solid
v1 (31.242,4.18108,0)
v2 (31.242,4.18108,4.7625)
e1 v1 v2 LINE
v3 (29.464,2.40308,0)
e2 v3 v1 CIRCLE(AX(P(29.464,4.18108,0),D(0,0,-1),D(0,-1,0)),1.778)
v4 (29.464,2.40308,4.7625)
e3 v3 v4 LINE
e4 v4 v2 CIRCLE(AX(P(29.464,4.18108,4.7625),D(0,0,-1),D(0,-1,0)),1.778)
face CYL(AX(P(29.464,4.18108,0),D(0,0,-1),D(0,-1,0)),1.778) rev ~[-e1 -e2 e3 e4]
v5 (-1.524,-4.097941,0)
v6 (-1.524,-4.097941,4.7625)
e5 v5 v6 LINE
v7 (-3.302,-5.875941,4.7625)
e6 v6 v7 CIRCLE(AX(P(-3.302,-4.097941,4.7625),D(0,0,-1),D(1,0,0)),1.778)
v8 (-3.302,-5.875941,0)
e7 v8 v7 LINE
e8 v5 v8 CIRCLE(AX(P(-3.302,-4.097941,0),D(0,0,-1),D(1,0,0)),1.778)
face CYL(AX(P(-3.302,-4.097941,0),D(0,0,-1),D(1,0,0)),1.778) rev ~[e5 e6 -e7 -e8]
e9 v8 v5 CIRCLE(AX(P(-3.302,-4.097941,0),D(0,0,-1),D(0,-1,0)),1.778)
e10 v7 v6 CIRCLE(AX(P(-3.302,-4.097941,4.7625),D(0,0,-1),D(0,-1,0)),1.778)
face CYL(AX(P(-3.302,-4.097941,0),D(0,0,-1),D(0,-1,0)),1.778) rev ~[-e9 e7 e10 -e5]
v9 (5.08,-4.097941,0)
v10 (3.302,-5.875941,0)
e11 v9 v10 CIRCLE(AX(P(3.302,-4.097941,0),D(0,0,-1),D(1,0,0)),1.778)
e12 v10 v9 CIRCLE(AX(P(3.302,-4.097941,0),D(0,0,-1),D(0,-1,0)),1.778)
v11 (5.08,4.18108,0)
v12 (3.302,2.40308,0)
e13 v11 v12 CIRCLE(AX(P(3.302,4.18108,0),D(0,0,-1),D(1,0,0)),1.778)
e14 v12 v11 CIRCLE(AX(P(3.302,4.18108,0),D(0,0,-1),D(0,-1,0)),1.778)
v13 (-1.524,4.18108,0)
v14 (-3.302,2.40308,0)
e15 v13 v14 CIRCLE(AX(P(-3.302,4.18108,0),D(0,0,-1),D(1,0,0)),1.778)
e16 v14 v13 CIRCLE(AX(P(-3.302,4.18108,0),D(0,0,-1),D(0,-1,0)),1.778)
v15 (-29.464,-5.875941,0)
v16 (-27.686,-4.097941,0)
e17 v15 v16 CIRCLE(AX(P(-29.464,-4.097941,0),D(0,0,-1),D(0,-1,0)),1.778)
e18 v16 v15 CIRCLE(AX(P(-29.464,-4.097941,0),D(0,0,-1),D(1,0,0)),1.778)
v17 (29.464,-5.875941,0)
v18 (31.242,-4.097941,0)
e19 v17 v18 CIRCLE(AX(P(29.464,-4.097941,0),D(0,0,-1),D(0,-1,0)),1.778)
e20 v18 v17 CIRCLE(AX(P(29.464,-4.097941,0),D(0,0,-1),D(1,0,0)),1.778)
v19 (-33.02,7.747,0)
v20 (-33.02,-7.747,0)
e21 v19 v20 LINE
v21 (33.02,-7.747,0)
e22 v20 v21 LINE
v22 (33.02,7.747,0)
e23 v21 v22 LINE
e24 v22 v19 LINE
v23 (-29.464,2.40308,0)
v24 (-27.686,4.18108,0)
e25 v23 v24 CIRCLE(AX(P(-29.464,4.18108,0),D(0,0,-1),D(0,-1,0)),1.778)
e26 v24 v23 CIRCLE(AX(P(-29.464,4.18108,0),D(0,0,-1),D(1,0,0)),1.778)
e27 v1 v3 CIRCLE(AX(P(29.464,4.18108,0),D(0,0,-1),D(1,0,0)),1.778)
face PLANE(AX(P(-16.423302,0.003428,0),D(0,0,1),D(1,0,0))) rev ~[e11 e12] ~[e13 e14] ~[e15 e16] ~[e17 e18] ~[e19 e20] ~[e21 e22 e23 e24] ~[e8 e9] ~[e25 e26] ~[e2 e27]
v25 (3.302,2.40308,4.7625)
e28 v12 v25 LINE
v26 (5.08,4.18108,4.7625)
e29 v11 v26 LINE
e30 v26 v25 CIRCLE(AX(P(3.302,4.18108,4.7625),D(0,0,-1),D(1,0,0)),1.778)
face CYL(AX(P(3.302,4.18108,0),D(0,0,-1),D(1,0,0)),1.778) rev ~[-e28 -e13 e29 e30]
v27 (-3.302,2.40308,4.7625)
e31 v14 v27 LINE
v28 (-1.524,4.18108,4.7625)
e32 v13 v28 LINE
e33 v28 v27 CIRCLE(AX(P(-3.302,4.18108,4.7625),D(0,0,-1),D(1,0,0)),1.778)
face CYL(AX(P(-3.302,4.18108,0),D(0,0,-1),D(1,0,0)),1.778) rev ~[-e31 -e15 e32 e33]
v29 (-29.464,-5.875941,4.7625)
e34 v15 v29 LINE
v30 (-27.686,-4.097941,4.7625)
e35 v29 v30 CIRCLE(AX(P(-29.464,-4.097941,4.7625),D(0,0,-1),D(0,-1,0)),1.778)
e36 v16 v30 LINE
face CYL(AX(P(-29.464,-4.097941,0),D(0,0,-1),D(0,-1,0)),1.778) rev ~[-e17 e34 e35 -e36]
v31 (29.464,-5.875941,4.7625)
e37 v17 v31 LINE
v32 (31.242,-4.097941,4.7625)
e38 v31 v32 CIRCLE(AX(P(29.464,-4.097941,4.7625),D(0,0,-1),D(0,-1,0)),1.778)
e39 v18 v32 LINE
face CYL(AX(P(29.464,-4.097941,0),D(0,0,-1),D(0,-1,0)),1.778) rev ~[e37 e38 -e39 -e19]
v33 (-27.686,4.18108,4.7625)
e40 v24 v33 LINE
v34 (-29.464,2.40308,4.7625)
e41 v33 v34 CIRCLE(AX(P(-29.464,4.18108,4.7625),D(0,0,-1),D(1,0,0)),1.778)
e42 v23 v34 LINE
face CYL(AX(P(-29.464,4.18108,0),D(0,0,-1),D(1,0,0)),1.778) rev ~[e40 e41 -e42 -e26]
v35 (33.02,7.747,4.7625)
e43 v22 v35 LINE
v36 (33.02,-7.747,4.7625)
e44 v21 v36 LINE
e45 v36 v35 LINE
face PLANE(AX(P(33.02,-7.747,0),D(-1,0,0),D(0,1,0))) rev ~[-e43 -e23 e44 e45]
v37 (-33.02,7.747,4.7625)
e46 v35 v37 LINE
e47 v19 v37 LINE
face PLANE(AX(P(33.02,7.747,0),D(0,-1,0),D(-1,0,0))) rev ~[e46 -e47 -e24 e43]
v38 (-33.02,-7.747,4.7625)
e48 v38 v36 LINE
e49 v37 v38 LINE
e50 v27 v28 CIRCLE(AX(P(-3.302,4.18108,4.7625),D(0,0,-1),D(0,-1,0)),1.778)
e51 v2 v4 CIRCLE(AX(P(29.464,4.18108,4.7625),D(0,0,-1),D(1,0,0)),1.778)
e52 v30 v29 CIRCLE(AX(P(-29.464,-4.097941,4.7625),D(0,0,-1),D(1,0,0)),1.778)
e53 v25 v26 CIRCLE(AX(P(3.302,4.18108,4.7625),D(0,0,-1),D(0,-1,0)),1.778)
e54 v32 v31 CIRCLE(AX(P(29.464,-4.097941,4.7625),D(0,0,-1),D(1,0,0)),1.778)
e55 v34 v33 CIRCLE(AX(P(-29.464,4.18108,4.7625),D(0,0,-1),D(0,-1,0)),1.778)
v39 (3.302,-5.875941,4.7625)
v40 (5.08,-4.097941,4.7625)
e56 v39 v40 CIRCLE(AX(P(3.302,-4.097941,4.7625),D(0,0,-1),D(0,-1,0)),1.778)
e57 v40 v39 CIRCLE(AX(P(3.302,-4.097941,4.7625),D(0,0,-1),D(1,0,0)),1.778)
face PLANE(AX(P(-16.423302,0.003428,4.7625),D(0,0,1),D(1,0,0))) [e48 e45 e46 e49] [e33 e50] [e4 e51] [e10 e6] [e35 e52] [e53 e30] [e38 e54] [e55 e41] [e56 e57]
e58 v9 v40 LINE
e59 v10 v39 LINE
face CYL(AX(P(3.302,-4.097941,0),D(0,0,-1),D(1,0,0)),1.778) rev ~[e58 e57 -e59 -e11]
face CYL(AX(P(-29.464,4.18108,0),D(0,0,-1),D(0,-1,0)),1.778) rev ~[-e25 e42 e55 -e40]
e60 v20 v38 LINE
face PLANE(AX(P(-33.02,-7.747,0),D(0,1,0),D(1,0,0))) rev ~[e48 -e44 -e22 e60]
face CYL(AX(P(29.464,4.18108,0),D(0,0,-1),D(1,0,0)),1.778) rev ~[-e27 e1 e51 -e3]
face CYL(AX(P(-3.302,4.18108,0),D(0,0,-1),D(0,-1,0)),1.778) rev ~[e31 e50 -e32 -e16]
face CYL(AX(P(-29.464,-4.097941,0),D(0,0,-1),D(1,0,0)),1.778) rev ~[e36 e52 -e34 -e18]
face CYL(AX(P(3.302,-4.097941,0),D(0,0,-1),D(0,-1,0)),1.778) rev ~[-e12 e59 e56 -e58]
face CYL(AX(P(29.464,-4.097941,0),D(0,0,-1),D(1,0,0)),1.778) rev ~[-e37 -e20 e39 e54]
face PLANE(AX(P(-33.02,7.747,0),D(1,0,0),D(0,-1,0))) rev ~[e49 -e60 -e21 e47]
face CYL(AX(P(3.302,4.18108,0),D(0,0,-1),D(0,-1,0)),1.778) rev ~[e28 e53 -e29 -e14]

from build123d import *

# Parameters (mm, degrees)
F1_DEPTH = 4.7625


# Not quite as in the source:
# - a length typed as a fraction of an inch, garbled in the dataset ("3 / 203.2 mm" for 3/8 in), is restored


with BuildPart() as f1:
    # F0 (on Top) → F1 (new body)
    with BuildSketch(Plane.XY):
        with BuildLine():
            Line((-3.302, 5.9590800321), (-3.302, 7.747))
            Line((-3.302, 7.747), (-29.464, 7.747))
            Line((-29.464, 7.747), (-29.464, 5.9590800321))
            ThreePointArc((-29.464, 5.9590800321), (-28.2067641431, 5.4383158891), (-27.686, 4.1810800321))
            ThreePointArc((-27.686, 4.1810800321), (-28.2067641431, 2.9238441752), (-29.464, 2.4030800321))
            Line((-29.464, 2.4030800321), (-29.464, -2.3199413316))
            ThreePointArc((-29.464, -2.3199413316), (-28.2067641431, -2.8407054746), (-27.686, -4.0979413316))
            ThreePointArc((-27.686, -4.0979413316), (-28.2067641431, -5.3551771885), (-29.464, -5.8759413316))
            Line((-29.464, -5.8759413316), (-29.464, -7.747))
            Line((-29.464, -7.747), (-3.302, -7.747))
            Line((-3.302, -7.747), (-3.302, -5.8759413316))
            ThreePointArc((-3.302, -5.8759413316), (-5.08, -4.0979413316), (-3.302, -2.3199413316))
            Line((-3.302, -2.3199413316), (-3.302, 2.4030800321))
            ThreePointArc((-3.302, 2.4030800321), (-5.08, 4.1810800321), (-3.302, 5.9590800321))
        make_face()
        with BuildLine():
            Line((-29.464, 5.9590800321), (-29.464, 7.747))
            Line((-29.464, 7.747), (-33.02, 7.747))
            Line((-33.02, 7.747), (-33.02, -7.747))
            Line((-33.02, -7.747), (-29.464, -7.747))
            Line((-29.464, -7.747), (-29.464, -5.8759413316))
            ThreePointArc((-29.464, -5.8759413316), (-31.242, -4.0979413316), (-29.464, -2.3199413316))
            Line((-29.464, -2.3199413316), (-29.464, 2.4030800321))
            ThreePointArc((-29.464, 2.4030800321), (-31.242, 4.1810800321), (-29.464, 5.9590800321))
        make_face()
        with BuildLine():
            Line((29.464, 5.9590800321), (29.464, 7.747))
            Line((29.464, 7.747), (3.302, 7.747))
            Line((3.302, 7.747), (3.302, 5.9590800321))
            ThreePointArc((3.302, 5.9590800321), (4.5592358569, 5.4383158891), (5.08, 4.1810800321))
            ThreePointArc((5.08, 4.1810800321), (4.5592358569, 2.9238441752), (3.302, 2.4030800321))
            Line((3.302, 2.4030800321), (3.302, -2.3199413316))
            ThreePointArc((3.302, -2.3199413316), (4.5592358569, -2.8407054746), (5.08, -4.0979413316))
            ThreePointArc((5.08, -4.0979413316), (4.5592358569, -5.3551771885), (3.302, -5.8759413316))
            Line((3.302, -5.8759413316), (3.302, -7.747))
            Line((3.302, -7.747), (29.464, -7.747))
            Line((29.464, -7.747), (29.464, -5.8759413316))
            ThreePointArc((29.464, -5.8759413316), (27.686, -4.0979413316), (29.464, -2.3199413316))
            Line((29.464, -2.3199413316), (29.464, 2.4030800321))
            ThreePointArc((29.464, 2.4030800321), (27.686, 4.1810800321), (29.464, 5.9590800321))
        make_face()
        with BuildLine():
            Line((33.02, -7.747), (33.02, 7.747))
            Line((33.02, 7.747), (29.464, 7.747))
            Line((29.464, 7.747), (29.464, 5.9590800321))
            ThreePointArc((29.464, 5.9590800321), (30.7212358569, 5.4383158891), (31.242, 4.1810800321))
            ThreePointArc((31.242, 4.1810800321), (30.7212358569, 2.9238441752), (29.464, 2.4030800321))
            Line((29.464, 2.4030800321), (29.464, -2.3199413316))
            ThreePointArc((29.464, -2.3199413316), (30.7212358569, -2.8407054746), (31.242, -4.0979413316))
            ThreePointArc((31.242, -4.0979413316), (30.7212358569, -5.3551771885), (29.464, -5.8759413316))
            Line((29.464, -5.8759413316), (29.464, -7.747))
            Line((29.464, -7.747), (33.02, -7.747))
        make_face()
        with BuildLine():
            Line((3.302, 5.9590800321), (3.302, 7.747))
            Line((3.302, 7.747), (-3.302, 7.747))
            Line((-3.302, 7.747), (-3.302, 5.9590800321))
            ThreePointArc((-3.302, 5.9590800321), (-2.0447641431, 5.4383158891), (-1.524, 4.1810800321))
            ThreePointArc((-1.524, 4.1810800321), (-2.0447641431, 2.9238441752), (-3.302, 2.4030800321))
            Line((-3.302, 2.4030800321), (-3.302, -2.3199413316))
            ThreePointArc((-3.302, -2.3199413316), (-2.0447641431, -2.8407054746), (-1.524, -4.0979413316))
            ThreePointArc((-1.524, -4.0979413316), (-2.0447641431, -5.3551771885), (-3.302, -5.8759413316))
            Line((-3.302, -5.8759413316), (-3.302, -7.747))
            Line((-3.302, -7.747), (3.302, -7.747))
            Line((3.302, -7.747), (3.302, -5.8759413316))
            ThreePointArc((3.302, -5.8759413316), (1.524, -4.0979413316), (3.302, -2.3199413316))
            Line((3.302, -2.3199413316), (3.302, 2.4030800321))
            ThreePointArc((3.302, 2.4030800321), (1.524, 4.1810800321), (3.302, 5.9590800321))
        make_face()
    extrude(amount=F1_DEPTH)


solid = f1.part
